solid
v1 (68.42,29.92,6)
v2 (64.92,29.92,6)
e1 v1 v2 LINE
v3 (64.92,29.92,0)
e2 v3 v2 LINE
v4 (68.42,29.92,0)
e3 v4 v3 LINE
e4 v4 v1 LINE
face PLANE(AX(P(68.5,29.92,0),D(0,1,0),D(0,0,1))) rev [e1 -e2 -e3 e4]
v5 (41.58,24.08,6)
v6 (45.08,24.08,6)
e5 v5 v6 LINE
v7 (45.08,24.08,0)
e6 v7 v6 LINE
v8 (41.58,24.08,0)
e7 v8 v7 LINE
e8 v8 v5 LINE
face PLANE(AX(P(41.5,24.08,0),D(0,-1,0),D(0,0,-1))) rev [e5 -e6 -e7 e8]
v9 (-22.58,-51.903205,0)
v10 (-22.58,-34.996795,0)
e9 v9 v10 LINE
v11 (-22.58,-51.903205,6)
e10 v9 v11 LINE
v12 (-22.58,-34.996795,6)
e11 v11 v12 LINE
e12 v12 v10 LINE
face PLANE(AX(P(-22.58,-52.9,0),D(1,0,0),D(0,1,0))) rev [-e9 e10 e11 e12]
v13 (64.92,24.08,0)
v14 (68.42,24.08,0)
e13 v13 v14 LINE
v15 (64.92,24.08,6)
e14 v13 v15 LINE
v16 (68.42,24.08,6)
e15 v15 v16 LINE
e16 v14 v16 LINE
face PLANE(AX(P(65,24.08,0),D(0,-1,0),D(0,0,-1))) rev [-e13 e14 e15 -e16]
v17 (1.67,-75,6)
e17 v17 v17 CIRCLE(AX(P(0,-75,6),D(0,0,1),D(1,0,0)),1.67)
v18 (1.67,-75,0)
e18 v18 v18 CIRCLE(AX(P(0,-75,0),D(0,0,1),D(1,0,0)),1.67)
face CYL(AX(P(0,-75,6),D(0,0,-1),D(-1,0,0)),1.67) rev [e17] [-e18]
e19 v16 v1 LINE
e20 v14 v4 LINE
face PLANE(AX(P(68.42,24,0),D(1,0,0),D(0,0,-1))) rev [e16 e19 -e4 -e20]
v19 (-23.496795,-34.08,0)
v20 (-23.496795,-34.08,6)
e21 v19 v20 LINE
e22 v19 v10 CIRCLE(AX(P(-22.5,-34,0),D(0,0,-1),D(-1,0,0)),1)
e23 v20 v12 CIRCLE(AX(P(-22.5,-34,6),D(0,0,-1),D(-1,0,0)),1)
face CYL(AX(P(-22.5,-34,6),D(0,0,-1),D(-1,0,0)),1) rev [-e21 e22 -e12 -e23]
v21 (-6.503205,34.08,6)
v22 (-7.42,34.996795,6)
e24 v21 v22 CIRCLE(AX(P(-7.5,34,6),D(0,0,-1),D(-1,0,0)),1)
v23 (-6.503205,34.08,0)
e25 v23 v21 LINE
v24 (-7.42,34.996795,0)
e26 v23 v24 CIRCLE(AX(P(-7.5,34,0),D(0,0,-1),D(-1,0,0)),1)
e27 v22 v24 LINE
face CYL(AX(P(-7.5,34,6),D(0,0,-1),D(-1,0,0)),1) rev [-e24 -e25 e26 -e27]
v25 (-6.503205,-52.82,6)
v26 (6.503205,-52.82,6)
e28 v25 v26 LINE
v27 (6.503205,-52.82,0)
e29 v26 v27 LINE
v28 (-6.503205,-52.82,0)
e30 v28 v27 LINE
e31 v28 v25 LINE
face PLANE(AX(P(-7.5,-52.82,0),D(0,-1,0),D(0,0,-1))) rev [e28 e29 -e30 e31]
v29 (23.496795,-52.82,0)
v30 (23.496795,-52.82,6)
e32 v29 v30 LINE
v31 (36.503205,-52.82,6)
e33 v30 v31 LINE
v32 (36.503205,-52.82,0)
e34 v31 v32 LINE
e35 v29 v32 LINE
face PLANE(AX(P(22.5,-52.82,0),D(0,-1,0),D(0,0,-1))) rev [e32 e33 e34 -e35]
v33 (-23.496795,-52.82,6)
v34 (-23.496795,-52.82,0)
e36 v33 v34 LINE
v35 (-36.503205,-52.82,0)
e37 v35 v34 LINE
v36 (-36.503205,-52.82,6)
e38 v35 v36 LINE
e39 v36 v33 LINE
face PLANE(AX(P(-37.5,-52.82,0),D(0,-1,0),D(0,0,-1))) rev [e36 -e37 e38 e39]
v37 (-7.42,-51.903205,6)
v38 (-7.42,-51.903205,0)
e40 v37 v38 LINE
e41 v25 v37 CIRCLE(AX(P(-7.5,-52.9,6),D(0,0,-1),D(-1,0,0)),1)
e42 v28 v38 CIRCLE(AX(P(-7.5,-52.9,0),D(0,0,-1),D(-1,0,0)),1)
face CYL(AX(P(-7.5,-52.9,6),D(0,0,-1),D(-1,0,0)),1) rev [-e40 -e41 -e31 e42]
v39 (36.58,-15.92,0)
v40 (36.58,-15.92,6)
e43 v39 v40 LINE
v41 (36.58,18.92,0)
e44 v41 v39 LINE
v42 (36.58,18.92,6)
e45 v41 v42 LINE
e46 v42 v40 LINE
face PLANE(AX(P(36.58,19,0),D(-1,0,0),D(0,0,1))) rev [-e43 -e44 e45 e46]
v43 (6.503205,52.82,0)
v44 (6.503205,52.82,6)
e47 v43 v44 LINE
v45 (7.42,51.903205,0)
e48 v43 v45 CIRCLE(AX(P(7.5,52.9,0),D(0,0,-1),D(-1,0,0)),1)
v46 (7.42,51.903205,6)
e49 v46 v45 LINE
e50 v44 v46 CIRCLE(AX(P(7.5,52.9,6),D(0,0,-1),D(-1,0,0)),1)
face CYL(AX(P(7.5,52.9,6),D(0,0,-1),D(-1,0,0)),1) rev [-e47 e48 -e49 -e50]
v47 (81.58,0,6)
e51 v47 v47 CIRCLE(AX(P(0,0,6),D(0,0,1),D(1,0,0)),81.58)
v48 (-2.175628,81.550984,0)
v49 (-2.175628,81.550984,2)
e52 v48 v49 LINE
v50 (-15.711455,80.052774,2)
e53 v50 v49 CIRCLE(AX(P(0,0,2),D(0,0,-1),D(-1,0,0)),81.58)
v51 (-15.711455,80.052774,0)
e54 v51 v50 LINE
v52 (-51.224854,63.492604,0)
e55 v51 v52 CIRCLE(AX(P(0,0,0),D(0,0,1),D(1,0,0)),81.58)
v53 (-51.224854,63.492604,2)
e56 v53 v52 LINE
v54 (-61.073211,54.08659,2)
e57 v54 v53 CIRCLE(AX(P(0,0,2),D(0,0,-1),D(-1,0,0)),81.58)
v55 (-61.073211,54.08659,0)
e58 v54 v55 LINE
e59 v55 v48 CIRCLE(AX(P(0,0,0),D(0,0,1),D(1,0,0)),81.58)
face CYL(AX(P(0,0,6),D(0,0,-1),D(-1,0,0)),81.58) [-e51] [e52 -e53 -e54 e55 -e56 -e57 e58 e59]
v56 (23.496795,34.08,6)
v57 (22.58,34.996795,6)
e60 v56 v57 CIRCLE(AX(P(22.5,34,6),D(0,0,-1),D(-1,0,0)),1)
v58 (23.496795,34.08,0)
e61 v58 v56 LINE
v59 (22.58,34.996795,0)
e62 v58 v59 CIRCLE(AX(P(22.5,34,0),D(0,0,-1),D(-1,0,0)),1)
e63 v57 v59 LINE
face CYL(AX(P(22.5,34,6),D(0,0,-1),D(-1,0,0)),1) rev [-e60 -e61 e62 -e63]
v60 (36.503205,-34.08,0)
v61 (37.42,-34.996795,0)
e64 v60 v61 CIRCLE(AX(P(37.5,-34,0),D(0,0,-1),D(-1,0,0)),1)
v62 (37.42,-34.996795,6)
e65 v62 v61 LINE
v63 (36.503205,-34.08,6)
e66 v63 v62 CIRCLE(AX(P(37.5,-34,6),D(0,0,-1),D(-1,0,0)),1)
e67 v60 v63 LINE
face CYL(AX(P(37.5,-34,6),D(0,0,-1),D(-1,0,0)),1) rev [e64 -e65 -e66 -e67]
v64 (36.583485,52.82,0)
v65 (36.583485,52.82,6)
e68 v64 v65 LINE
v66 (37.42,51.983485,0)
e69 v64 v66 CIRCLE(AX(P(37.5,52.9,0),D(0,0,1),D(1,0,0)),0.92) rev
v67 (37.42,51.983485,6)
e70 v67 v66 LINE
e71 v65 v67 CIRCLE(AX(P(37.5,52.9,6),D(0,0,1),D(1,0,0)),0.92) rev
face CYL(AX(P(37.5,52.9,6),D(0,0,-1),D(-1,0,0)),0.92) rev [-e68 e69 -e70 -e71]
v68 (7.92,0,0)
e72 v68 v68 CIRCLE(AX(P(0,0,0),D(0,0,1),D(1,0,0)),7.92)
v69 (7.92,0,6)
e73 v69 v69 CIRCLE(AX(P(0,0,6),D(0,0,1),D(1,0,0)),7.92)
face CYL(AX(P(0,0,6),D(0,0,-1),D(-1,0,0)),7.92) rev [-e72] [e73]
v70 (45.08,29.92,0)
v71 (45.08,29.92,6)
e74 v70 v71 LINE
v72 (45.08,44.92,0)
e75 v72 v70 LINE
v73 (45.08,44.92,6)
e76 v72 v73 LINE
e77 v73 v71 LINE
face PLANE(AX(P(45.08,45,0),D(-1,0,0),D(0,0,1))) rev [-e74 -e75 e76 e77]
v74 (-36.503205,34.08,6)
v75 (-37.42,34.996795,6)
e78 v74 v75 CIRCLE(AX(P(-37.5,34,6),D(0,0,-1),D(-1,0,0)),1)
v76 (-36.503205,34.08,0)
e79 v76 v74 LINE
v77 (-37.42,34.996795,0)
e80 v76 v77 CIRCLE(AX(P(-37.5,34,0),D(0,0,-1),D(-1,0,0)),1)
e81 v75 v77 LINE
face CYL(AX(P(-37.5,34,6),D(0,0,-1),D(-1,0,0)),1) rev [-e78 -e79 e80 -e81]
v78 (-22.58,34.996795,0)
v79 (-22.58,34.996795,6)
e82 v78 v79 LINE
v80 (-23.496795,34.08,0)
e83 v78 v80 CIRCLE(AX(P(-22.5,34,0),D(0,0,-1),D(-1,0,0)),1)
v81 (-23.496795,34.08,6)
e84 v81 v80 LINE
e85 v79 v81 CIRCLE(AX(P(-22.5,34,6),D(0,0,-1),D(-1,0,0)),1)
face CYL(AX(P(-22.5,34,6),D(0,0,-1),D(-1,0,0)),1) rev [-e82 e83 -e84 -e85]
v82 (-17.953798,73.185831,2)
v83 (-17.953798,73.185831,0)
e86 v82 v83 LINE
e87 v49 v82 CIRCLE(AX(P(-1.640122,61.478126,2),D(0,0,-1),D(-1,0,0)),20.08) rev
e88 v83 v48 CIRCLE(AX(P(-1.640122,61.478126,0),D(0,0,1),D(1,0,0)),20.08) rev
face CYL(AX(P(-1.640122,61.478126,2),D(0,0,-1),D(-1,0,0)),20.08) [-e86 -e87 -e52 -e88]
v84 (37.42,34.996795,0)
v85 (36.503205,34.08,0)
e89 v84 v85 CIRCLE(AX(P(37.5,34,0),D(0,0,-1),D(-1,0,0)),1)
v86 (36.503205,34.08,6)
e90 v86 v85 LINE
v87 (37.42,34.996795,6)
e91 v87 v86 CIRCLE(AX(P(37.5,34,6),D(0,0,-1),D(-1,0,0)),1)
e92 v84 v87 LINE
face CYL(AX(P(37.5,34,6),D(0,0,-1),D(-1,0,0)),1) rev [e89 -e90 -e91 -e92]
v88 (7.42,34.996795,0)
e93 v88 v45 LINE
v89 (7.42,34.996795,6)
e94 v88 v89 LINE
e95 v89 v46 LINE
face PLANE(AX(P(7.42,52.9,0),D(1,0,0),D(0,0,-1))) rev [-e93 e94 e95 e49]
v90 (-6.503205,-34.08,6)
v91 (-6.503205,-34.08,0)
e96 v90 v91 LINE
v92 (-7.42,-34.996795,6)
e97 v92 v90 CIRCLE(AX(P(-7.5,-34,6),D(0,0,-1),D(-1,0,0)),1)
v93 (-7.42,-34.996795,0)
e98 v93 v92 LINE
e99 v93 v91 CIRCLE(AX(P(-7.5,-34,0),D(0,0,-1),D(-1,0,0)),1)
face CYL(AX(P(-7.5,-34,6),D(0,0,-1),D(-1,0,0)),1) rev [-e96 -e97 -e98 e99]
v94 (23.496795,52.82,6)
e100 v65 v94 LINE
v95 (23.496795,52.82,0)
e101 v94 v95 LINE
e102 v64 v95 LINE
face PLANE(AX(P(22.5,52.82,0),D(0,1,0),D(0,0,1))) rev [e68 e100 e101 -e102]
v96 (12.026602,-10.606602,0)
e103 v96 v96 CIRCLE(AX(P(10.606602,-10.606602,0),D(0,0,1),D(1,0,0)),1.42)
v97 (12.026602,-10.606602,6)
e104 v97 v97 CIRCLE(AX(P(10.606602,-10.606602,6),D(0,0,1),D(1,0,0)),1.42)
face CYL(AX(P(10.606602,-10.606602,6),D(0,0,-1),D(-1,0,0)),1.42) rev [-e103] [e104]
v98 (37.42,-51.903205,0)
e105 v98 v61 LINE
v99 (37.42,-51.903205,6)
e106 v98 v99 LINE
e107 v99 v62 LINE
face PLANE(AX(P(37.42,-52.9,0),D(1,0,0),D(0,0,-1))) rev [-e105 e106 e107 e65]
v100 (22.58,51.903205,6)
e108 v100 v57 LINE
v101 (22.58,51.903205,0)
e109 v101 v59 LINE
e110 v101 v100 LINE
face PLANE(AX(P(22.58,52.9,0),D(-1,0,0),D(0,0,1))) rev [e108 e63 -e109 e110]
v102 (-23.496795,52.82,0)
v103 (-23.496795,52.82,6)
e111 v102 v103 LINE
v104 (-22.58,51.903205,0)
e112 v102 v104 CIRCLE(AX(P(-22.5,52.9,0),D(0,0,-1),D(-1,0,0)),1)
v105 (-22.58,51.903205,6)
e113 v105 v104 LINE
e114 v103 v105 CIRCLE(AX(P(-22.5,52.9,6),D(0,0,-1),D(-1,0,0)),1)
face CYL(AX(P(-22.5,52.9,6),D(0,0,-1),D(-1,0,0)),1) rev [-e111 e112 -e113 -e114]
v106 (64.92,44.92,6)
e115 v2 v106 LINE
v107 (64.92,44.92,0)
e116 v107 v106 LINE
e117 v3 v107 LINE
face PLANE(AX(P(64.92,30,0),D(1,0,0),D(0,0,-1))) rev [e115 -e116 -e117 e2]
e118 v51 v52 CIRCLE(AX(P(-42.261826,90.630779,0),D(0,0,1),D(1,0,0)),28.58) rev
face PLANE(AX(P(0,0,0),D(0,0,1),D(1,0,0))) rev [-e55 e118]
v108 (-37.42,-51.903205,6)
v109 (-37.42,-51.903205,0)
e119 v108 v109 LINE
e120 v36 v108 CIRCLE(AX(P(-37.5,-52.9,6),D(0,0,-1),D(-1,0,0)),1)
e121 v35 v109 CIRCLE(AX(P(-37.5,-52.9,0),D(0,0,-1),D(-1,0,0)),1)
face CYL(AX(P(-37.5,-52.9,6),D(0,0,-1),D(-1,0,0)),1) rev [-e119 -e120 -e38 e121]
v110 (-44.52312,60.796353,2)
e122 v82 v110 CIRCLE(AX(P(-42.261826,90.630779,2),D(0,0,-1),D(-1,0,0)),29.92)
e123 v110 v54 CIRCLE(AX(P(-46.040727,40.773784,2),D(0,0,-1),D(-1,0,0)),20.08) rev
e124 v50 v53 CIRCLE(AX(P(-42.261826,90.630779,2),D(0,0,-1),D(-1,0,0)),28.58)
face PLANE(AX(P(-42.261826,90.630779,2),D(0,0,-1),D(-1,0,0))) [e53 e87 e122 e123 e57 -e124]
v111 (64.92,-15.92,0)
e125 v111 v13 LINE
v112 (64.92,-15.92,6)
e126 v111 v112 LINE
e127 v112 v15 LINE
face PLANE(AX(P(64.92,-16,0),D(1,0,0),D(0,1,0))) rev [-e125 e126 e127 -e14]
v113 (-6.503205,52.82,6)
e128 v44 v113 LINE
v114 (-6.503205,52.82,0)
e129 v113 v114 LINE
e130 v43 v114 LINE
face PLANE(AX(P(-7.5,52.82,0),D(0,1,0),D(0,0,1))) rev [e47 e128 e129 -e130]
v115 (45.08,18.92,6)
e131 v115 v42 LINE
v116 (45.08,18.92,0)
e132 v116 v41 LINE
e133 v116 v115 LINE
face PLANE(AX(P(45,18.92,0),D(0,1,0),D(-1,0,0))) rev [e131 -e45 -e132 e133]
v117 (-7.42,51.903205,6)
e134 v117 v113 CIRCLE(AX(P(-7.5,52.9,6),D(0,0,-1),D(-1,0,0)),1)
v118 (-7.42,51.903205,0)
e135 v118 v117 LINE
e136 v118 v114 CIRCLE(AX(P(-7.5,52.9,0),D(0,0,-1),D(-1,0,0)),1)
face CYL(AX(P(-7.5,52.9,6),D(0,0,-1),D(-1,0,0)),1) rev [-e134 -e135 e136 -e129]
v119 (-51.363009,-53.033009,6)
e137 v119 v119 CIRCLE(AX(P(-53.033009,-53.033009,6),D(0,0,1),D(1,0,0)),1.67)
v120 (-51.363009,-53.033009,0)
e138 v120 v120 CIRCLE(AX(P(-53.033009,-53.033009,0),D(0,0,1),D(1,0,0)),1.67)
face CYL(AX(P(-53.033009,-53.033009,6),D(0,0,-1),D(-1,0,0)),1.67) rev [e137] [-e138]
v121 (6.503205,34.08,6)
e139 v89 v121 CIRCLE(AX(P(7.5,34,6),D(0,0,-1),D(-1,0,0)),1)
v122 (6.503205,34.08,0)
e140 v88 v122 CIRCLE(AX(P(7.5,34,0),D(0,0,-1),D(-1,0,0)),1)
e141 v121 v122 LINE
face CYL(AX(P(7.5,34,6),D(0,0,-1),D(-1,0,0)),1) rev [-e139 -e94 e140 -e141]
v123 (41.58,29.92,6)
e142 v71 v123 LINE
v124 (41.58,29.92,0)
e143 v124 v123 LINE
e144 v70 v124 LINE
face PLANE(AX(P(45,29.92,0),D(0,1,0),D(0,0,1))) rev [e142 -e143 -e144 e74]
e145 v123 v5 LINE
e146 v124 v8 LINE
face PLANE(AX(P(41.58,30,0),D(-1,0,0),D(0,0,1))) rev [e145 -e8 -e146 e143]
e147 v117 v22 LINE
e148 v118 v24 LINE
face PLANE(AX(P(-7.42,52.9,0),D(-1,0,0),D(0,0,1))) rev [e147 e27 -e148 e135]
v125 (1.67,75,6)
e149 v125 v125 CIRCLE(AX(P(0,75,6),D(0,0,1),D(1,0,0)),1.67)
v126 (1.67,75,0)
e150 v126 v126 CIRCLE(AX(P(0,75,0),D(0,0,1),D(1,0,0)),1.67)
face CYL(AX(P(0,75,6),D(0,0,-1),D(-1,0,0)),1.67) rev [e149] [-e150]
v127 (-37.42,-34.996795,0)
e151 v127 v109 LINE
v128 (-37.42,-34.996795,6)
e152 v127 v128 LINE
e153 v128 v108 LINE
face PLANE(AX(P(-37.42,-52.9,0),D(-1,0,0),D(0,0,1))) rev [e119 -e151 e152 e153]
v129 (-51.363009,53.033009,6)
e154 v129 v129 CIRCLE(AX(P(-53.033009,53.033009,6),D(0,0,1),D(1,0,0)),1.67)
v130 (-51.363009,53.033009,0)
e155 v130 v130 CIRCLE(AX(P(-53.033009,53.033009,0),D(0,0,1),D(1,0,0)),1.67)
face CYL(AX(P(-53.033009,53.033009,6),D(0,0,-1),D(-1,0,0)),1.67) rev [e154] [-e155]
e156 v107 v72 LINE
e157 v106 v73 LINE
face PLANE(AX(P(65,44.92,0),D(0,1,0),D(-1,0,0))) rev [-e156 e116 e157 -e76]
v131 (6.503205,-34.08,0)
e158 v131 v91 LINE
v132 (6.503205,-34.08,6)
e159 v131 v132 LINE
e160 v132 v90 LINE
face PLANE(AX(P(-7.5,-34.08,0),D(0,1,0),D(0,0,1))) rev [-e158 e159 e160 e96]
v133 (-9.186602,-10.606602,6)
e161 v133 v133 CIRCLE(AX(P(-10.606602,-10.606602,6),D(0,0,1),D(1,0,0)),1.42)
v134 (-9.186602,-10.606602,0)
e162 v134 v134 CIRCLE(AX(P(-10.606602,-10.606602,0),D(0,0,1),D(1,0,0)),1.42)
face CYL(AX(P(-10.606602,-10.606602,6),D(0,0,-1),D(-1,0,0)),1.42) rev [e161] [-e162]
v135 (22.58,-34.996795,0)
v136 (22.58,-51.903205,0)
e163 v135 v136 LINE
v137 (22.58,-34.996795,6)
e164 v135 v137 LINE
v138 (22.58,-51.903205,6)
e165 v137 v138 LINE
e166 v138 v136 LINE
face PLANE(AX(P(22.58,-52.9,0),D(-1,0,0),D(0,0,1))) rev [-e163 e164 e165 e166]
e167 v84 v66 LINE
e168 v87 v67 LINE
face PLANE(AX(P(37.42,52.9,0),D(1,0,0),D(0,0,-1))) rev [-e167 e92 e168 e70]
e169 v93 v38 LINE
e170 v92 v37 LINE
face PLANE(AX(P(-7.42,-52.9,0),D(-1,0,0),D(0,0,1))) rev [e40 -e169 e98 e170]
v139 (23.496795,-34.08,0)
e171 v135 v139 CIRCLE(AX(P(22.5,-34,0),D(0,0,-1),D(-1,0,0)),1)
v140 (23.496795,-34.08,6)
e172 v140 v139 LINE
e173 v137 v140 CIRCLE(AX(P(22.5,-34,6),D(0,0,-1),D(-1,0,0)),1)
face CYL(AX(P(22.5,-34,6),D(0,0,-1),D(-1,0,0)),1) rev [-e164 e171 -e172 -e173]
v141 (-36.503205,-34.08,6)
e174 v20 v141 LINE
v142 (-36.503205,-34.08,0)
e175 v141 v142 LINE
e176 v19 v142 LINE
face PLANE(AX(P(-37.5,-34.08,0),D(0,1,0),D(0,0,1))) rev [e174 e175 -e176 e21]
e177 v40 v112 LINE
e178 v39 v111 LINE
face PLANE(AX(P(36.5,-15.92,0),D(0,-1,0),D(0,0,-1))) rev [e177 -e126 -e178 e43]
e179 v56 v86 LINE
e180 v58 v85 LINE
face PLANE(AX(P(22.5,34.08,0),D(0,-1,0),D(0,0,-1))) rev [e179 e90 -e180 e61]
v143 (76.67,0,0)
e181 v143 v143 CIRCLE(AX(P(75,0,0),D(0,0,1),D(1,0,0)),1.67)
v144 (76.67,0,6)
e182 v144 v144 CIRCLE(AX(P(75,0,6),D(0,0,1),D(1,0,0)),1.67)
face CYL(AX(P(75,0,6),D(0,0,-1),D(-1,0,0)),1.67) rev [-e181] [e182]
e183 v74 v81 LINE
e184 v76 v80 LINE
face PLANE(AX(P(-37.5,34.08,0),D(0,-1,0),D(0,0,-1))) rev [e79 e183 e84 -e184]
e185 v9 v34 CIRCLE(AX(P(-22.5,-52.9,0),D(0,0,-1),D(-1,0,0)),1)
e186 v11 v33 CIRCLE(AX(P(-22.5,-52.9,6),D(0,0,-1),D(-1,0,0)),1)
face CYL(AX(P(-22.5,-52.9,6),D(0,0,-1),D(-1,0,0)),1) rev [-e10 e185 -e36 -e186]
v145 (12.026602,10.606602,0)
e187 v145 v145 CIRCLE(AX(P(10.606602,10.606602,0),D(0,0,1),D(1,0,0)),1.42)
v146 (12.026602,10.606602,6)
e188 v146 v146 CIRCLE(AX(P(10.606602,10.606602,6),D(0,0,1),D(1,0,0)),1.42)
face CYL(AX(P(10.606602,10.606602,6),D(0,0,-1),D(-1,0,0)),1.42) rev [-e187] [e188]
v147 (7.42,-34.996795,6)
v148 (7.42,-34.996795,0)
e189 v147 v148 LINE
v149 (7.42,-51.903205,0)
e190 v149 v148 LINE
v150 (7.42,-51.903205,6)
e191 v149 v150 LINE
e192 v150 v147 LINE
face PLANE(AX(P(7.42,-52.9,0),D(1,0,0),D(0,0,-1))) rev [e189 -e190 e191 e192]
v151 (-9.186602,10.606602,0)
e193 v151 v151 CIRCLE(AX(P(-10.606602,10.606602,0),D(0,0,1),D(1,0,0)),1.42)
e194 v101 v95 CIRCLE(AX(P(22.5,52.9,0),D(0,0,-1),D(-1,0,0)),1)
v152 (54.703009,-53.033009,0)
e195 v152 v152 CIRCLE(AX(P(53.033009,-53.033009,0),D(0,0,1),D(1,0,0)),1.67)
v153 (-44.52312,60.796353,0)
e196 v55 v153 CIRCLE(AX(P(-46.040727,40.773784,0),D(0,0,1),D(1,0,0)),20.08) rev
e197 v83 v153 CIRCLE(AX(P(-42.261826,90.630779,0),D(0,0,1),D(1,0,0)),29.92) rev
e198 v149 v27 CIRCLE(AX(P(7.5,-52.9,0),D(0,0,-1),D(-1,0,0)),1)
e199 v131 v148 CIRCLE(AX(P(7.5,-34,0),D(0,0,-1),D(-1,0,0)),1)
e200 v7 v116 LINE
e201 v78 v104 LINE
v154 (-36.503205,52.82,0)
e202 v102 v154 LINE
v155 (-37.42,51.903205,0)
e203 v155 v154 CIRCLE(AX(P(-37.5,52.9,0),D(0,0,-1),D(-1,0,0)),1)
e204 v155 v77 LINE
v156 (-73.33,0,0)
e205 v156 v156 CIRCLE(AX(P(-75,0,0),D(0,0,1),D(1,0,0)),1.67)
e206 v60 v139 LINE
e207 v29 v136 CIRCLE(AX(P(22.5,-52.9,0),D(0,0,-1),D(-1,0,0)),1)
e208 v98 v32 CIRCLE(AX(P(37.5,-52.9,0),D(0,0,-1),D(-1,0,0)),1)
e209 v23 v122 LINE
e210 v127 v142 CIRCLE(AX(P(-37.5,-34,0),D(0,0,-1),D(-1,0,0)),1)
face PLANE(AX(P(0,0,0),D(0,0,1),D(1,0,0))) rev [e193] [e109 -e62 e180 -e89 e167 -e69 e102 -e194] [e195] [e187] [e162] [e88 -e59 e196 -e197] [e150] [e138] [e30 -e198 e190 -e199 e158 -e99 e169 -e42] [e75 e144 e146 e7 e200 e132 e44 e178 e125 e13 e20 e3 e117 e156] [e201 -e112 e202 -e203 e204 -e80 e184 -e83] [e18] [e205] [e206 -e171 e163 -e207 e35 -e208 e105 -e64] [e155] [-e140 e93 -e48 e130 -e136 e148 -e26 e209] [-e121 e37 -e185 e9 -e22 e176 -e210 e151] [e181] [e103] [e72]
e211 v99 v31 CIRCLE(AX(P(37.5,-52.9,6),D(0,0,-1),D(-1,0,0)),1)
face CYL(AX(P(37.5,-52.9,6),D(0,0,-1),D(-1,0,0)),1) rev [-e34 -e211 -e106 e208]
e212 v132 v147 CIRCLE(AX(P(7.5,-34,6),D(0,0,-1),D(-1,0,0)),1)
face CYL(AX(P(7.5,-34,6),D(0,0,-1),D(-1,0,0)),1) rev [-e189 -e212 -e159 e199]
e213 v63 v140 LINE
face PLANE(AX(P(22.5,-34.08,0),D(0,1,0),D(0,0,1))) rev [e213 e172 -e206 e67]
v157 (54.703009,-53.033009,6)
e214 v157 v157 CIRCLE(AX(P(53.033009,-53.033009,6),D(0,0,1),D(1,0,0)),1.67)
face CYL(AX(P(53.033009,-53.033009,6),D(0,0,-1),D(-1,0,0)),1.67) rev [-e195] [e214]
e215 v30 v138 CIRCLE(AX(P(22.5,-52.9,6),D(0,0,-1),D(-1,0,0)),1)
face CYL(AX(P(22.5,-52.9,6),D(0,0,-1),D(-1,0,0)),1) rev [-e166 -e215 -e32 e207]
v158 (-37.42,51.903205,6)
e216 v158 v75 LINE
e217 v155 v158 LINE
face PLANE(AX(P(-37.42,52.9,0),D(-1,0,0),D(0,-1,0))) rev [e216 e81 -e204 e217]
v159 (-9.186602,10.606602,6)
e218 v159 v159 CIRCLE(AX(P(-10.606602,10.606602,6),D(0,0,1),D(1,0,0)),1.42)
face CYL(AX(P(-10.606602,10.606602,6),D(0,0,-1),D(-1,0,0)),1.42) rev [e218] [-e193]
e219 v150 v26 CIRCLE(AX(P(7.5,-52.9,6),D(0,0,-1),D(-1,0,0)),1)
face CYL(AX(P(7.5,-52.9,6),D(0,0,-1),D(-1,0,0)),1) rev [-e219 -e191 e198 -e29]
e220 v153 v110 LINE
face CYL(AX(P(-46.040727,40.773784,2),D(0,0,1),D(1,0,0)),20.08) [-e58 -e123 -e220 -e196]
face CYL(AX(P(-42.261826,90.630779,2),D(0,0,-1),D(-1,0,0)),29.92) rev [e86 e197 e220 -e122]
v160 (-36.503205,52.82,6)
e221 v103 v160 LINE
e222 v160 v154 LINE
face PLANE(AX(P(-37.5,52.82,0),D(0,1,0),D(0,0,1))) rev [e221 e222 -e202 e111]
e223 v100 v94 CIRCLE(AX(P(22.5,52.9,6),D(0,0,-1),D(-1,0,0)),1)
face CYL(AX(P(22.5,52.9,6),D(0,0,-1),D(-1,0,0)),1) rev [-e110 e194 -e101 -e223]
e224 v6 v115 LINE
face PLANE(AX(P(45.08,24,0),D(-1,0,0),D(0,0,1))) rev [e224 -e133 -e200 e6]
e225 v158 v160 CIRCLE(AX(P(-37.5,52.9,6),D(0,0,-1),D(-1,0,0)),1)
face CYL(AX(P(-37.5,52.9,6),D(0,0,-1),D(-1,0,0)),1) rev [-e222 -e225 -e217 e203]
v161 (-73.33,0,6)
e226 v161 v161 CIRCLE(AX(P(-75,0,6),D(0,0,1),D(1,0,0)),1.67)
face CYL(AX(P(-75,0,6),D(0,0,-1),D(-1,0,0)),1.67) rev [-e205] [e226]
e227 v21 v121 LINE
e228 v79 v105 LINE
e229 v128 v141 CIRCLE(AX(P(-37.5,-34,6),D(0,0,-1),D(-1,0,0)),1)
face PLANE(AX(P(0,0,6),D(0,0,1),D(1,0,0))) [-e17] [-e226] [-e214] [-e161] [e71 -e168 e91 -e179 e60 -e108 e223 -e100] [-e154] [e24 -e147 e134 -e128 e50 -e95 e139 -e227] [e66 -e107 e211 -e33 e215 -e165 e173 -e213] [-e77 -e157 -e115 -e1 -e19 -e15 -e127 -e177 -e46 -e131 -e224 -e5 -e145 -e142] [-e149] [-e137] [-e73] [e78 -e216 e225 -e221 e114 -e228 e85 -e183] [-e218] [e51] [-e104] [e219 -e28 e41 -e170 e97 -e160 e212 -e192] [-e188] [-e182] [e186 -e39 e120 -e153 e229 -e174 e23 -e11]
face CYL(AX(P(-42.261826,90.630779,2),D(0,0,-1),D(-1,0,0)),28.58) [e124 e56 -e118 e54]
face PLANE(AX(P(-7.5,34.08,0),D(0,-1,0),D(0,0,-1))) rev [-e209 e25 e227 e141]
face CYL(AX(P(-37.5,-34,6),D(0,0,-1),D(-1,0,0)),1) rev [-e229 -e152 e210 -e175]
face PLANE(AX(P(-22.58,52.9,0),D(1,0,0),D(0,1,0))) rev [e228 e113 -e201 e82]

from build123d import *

# Parameters (mm, degrees)
SKETCH1_R              = 81.5
SKETCH1_R_2            = 8
SKETCH1_R_3            = 1.5
SKETCH1_R_4            = 1.75
BOSS_EXTRUDE1_DEPTH    = 6
CUT_EXTRUDE9_DEPTH     = 116.414470497
SKETCH13_W             = 15
SKETCH13_H             = 18.9
CUT_EXTRUDE10_DEPTH    = 116.414470497
SKETCH18_R             = 30
SKETCH18_R_2           = 28.5
CUT_EXTRUDE14_DEPTH    = 2
FILLET2_R              = 20
SKETCH19_R             = 1
CUT_EXTRUDE15_DEPTH    = 116.414470643
MOVE_FACE2_OUTLINE_R   = 8
MOVE_FACE2_OUTLINE_R_2 = 7.92
MOVE_FACE2_OUTLINE_R_3 = 1.5
MOVE_FACE2_OUTLINE_R_4 = 1.42
MOVE_FACE2_OUTLINE_R_5 = 1.75
MOVE_FACE2_OUTLINE_R_6 = 1.67
MOVE_FACE2_DEPTH       = 6
MOVE_START             = 2
MOVE_FACE2_2_DEPTH     = 4


# Read off the part's stored shape, not the designer's step: Move Face2
with BuildPart() as part:
    # Sketch1 → Boss-Extrude1 (new body)
    with BuildSketch(Plane.XY):
        Circle(SKETCH1_R)
        Circle(SKETCH1_R_2, mode=Mode.SUBTRACT)
        with Locations((10.606601718, -10.606601718)):
            Circle(SKETCH1_R_3, mode=Mode.SUBTRACT)
        with Locations((0, -75)):
            Circle(SKETCH1_R_4, mode=Mode.SUBTRACT)
        with Locations((-10.606601718, -10.606601718)):
            Circle(SKETCH1_R_3, mode=Mode.SUBTRACT)
        with Locations((-10.606601718, 10.606601718)):
            Circle(SKETCH1_R_3, mode=Mode.SUBTRACT)
        with Locations((10.606601718, 10.606601718)):
            Circle(SKETCH1_R_3, mode=Mode.SUBTRACT)
        with Locations((-53.033008589, -53.033008589)):
            Circle(SKETCH1_R_4, mode=Mode.SUBTRACT)
        with Locations((-75, 0)):
            Circle(SKETCH1_R_4, mode=Mode.SUBTRACT)
        with Locations((-53.033008589, 53.033008589)):
            Circle(SKETCH1_R_4, mode=Mode.SUBTRACT)
        with Locations((0, 75)):
            Circle(SKETCH1_R_4, mode=Mode.SUBTRACT)
        with Locations((75, 0)):
            Circle(SKETCH1_R_4, mode=Mode.SUBTRACT)
        with Locations((53.033008589, -53.033008589)):
            Circle(SKETCH1_R_4, mode=Mode.SUBTRACT)
    extrude(amount=BOSS_EXTRUDE1_DEPTH)

    # Sketch12 → Cut-Extrude9 (cut, through all)
    with BuildSketch(Plane.XY.offset(6)):
        Polygon((36.5, -16), (65, -16), (65, 24), (68.5, 24), (68.5, 30), (65, 30), (65, 45), (45, 45), (45, 30), (41.5, 30), (41.5, 24), (45, 24), (45, 19), (36.5, 19), align=None)
    extrude(amount=-CUT_EXTRUDE9_DEPTH, mode=Mode.SUBTRACT)

    # Sketch13 → Cut-Extrude10 (cut, through all)
    with BuildSketch(Plane.XY.offset(6)):
        with Locations((-30, -43.45)):
            Rectangle(SKETCH13_W, SKETCH13_H)
        with Locations((-30, 43.45)):
            Rectangle(SKETCH13_W, SKETCH13_H)
        with Locations((30, 43.45)):
            Rectangle(SKETCH13_W, SKETCH13_H)
        with Locations((0, -43.45)):
            Rectangle(SKETCH13_W, SKETCH13_H)
        with Locations((30, -43.45)):
            Rectangle(SKETCH13_W, SKETCH13_H)
        with Locations((0, 43.45)):
            Rectangle(SKETCH13_W, SKETCH13_H)
    extrude(amount=-CUT_EXTRUDE10_DEPTH, mode=Mode.SUBTRACT)

    # Sketch18 → Cut-Extrude14 (cut)
    with BuildSketch(Plane(origin=(0, 0, 0), x_dir=(-1, 0, 0), z_dir=(0, 0, -1))):
        with Locations((42.261826174, 90.630778704)):
            Circle(SKETCH18_R)
        with Locations((42.261826174, 90.630778704)):
            Circle(SKETCH18_R_2, mode=Mode.SUBTRACT)
    extrude(amount=-CUT_EXTRUDE14_DEPTH, mode=Mode.SUBTRACT)

    # Fillet2
    fillet2_edges = [part.edges().sort_by_distance(p)[0] for p in [
        (-52.421789967, 62.403573108, 1),
        (-14.107833342, 80.269664497, 1),
    ]]
    fillet(fillet2_edges, radius=FILLET2_R)

    # Sketch19 → Cut-Extrude15 (cut, through all)
    with BuildSketch(Plane(origin=(0, 0, 0), x_dir=(-1, 0, 0), z_dir=(0, 0, -1))):
        with Locations((-37.5, 52.9)):
            Circle(SKETCH19_R)
        with Locations((-22.5, 52.9)):
            Circle(SKETCH19_R)
        with Locations((-37.5, 34)):
            Circle(SKETCH19_R)
        with Locations((-22.5, 34)):
            Circle(SKETCH19_R)
        with Locations((-7.5, 52.9)):
            Circle(SKETCH19_R)
        with Locations((7.5, 52.9)):
            Circle(SKETCH19_R)
        with Locations((-7.5, 34)):
            Circle(SKETCH19_R)
        with Locations((7.5, 34)):
            Circle(SKETCH19_R)
        with Locations((22.5, 52.9)):
            Circle(SKETCH19_R)
        with Locations((37.5, 52.9)):
            Circle(SKETCH19_R)
        with Locations((22.5, 34)):
            Circle(SKETCH19_R)
        with Locations((37.5, 34)):
            Circle(SKETCH19_R)
        with Locations((-37.5, -34)):
            Circle(SKETCH19_R)
        with Locations((-22.5, -34)):
            Circle(SKETCH19_R)
        with Locations((-37.5, -52.9)):
            Circle(SKETCH19_R)
        with Locations((-22.5, -52.9)):
            Circle(SKETCH19_R)
        with Locations((-7.5, -34)):
            Circle(SKETCH19_R)
        with Locations((7.5, -34)):
            Circle(SKETCH19_R)
        with Locations((-7.5, -52.9)):
            Circle(SKETCH19_R)
        with Locations((7.5, -52.9)):
            Circle(SKETCH19_R)
        with Locations((22.5, -34)):
            Circle(SKETCH19_R)
        with Locations((37.5, -34)):
            Circle(SKETCH19_R)
        with Locations((22.5, -52.9)):
            Circle(SKETCH19_R)
        with Locations((37.5, -52.9)):
            Circle(SKETCH19_R)
    extrude(amount=-CUT_EXTRUDE15_DEPTH, mode=Mode.SUBTRACT)

    # Move Face2 outline → Move Face2 (add)
    # profile 1 of 38: a face of its own
    with BuildSketch(Plane.XY):
        with BuildLine():
            ThreePointArc((-61.073211328, 54.086590372), (34.477197793, -73.936589266), (-2.175628477, 81.550984303))
            ThreePointArc((-2.175628477, 81.550984303), (-11.045848253, 79.219003094), (-17.953798386, 73.18583144))
            ThreePointArc((-17.953798386, 73.18583144), (-29.617087783, 63.514049716), (-44.52312034, 60.79635314))
            ThreePointArc((-44.52312034, 60.79635314), (-53.585142714, 59.382604315), (-61.073211328, 54.086590372))
        make_face()
        with BuildLine():
            ThreePointArc((-61.013320951, 54.033551304), (-53.55508528, 59.308465589), (-44.529166581, 60.716581949))
            ThreePointArc((-44.529166581, 60.716581949), (-29.583278322, 63.441545093), (-17.888803659, 73.139187196))
            ThreePointArc((-17.888803659, 73.139187196), (-11.00837524, 79.14832231), (-2.173494985, 81.471012756))
            ThreePointArc((-2.173494985, 81.471012756), (34.443388332, -73.864084644), (-61.013320951, 54.033551304))
        make_face(mode=Mode.SUBTRACT)
    # profile 2 of 38: a face of its own
    with BuildSketch(Plane.XY):
        with BuildLine():
            ThreePointArc((-15.711454974, 80.052773735), (-34.477197793, 73.936589267), (-51.224853888, 63.492603854))
            ThreePointArc((-51.224853888, 63.492603854), (-30.183396253, 64.72850215), (-15.711454974, 80.052773735))
        make_face()
        with BuildLine():
            ThreePointArc((-51.059856357, 63.522760242), (-34.443388332, 73.864084643), (-15.840614477, 79.945762446))
            ThreePointArc((-15.840614477, 79.945762446), (-30.217205714, 64.801006773), (-51.059856357, 63.522760242))
        make_face(mode=Mode.SUBTRACT)
    # profile 3 of 38: a face of its own
    with BuildSketch(Plane.XY):
        with BuildLine():
            Line((-37.42, -51.903205136), (-37.42, -34.996794864))
            ThreePointArc((-37.42, -34.996794864), (-37.45996791, -34.999198395), (-37.5, -35))
            Line((-37.5, -35), (-37.5, -51.9))
            ThreePointArc((-37.5, -51.9), (-37.45996791, -51.900801605), (-37.42, -51.903205136))
        make_face()
    # profile 4 of 38: a face of its own
    with BuildSketch(Plane.XY):
        with BuildLine():
            Line((-23.5, -34), (-36.5, -34))
            ThreePointArc((-36.5, -34), (-36.500801605, -34.04003209), (-36.503205136, -34.08))
            Line((-36.503205136, -34.08), (-23.496794864, -34.08))
            ThreePointArc((-23.496794864, -34.08), (-23.499198395, -34.04003209), (-23.5, -34))
        make_face()
    # profile 5 of 38: a face of its own
    with BuildSketch(Plane.XY):
        with BuildLine():
            ThreePointArc((-36.503205136, -52.82), (-36.500801605, -52.85996791), (-36.5, -52.9))
            Line((-36.5, -52.9), (-23.5, -52.9))
            ThreePointArc((-23.5, -52.9), (-23.499198395, -52.85996791), (-23.496794864, -52.82))
            Line((-23.496794864, -52.82), (-36.503205136, -52.82))
        make_face()
    # profile 6 of 38: a face of its own
    with BuildSketch(Plane.XY):
        with BuildLine():
            Line((-22.5, -51.9), (-22.5, -35))
            ThreePointArc((-22.5, -35), (-22.54003209, -34.999198395), (-22.58, -34.996794864))
            Line((-22.58, -34.996794864), (-22.58, -51.903205136))
            ThreePointArc((-22.58, -51.903205136), (-22.54003209, -51.900801605), (-22.5, -51.9))
        make_face()
    # profile 7 of 38: a face of its own
    with BuildSketch(Plane.XY):
        with BuildLine():
            Line((-37.42, 34.996794864), (-37.42, 51.903205136))
            ThreePointArc((-37.42, 51.903205136), (-37.45996791, 51.900801605), (-37.5, 51.9))
            Line((-37.5, 51.9), (-37.5, 35))
            ThreePointArc((-37.5, 35), (-37.45996791, 34.999198395), (-37.42, 34.996794864))
        make_face()
    # profile 8 of 38: a face of its own
    with BuildSketch(Plane.XY):
        with BuildLine():
            Line((-23.5, 52.9), (-36.5, 52.9))
            ThreePointArc((-36.5, 52.9), (-36.500801605, 52.85996791), (-36.503205136, 52.82))
            Line((-36.503205136, 52.82), (-23.496794864, 52.82))
            ThreePointArc((-23.496794864, 52.82), (-23.499198395, 52.85996791), (-23.5, 52.9))
        make_face()
    # profile 9 of 38: a face of its own
    with BuildSketch(Plane.XY):
        with BuildLine():
            ThreePointArc((-36.503205136, 34.08), (-36.500801605, 34.04003209), (-36.5, 34))
            Line((-36.5, 34), (-23.5, 34))
            ThreePointArc((-23.5, 34), (-23.499198395, 34.04003209), (-23.496794864, 34.08))
            Line((-23.496794864, 34.08), (-36.503205136, 34.08))
        make_face()
    # profile 10 of 38: a face of its own
    with BuildSketch(Plane.XY):
        with BuildLine():
            Line((-22.5, 35), (-22.5, 51.9))
            ThreePointArc((-22.5, 51.9), (-22.54003209, 51.900801605), (-22.58, 51.903205136))
            Line((-22.58, 51.903205136), (-22.58, 34.996794864))
            ThreePointArc((-22.58, 34.996794864), (-22.54003209, 34.999198395), (-22.5, 35))
        make_face()
    # profile 11 of 38: a face of its own
    with BuildSketch(Plane.XY):
        with BuildLine():
            Line((-6.503205136, -34.08), (6.503205136, -34.08))
            ThreePointArc((6.503205136, -34.08), (6.500801605, -34.04003209), (6.5, -34))
            Line((6.5, -34), (-6.5, -34))
            ThreePointArc((-6.5, -34), (-6.500801605, -34.04003209), (-6.503205136, -34.08))
        make_face()
    # profile 12 of 38: a face of its own
    with BuildSketch(Plane.XY):
        with BuildLine():
            Line((7.5, -51.9), (7.5, -35))
            ThreePointArc((7.5, -35), (7.45996791, -34.999198395), (7.42, -34.996794864))
            Line((7.42, -34.996794864), (7.42, -51.903205136))
            ThreePointArc((7.42, -51.903205136), (7.45996791, -51.900801605), (7.5, -51.9))
        make_face()
    # profile 13 of 38: a face of its own
    with BuildSketch(Plane.XY):
        with BuildLine():
            ThreePointArc((-7.42, -34.996794864), (-7.45996791, -34.999198395), (-7.5, -35))
            Line((-7.5, -35), (-7.5, -51.9))
            ThreePointArc((-7.5, -51.9), (-7.45996791, -51.900801605), (-7.42, -51.903205136))
            Line((-7.42, -51.903205136), (-7.42, -34.996794864))
        make_face()
    # profile 14 of 38: a face of its own
    with BuildSketch(Plane.XY):
        with BuildLine():
            Line((-6.5, -52.9), (6.5, -52.9))
            ThreePointArc((6.5, -52.9), (6.500801605, -52.85996791), (6.503205136, -52.82))
            Line((6.503205136, -52.82), (-6.503205136, -52.82))
            ThreePointArc((-6.503205136, -52.82), (-6.500801605, -52.85996791), (-6.5, -52.9))
        make_face()
    # profile 15 of 38: a face of its own
    with BuildSketch(Plane.XY):
        with BuildLine():
            Line((23.496794864, -34.08), (36.503205136, -34.08))
            ThreePointArc((36.503205136, -34.08), (36.500801605, -34.04003209), (36.5, -34))
            Line((36.5, -34), (23.5, -34))
            ThreePointArc((23.5, -34), (23.499198395, -34.04003209), (23.496794864, -34.08))
        make_face()
    # profile 16 of 38: a face of its own
    with BuildSketch(Plane.XY):
        with BuildLine():
            Line((37.5, -51.9), (37.5, -35))
            ThreePointArc((37.5, -35), (37.45996791, -34.999198395), (37.42, -34.996794864))
            Line((37.42, -34.996794864), (37.42, -51.903205136))
            ThreePointArc((37.42, -51.903205136), (37.45996791, -51.900801605), (37.5, -51.9))
        make_face()
    # profile 17 of 38: a face of its own
    with BuildSketch(Plane.XY):
        with BuildLine():
            ThreePointArc((22.58, -34.996794864), (22.54003209, -34.999198395), (22.5, -35))
            Line((22.5, -35), (22.5, -51.9))
            ThreePointArc((22.5, -51.9), (22.54003209, -51.900801605), (22.58, -51.903205136))
            Line((22.58, -51.903205136), (22.58, -34.996794864))
        make_face()
    # profile 18 of 38: a face of its own
    with BuildSketch(Plane.XY):
        with BuildLine():
            Line((23.5, -52.9), (36.5, -52.9))
            ThreePointArc((36.5, -52.9), (36.500801605, -52.85996791), (36.503205136, -52.82))
            Line((36.503205136, -52.82), (23.496794864, -52.82))
            ThreePointArc((23.496794864, -52.82), (23.499198395, -52.85996791), (23.5, -52.9))
        make_face()
    # profile 19 of 38: a face of its own
    with BuildSketch(Plane.XY):
        with BuildLine():
            Line((23.496794864, 52.82), (36.583484861, 52.82))
            ThreePointArc((36.583484861, 52.82), (38.150538239, 53.550538239), (37.42, 51.983484861))
            Line((37.42, 51.983484861), (37.42, 34.996794864))
            ThreePointArc((37.42, 34.996794864), (37.45996791, 34.999198395), (37.5, 35))
            Line((37.5, 35), (37.5, 51.9))
            ThreePointArc((37.5, 51.9), (38.207106781, 53.607106781), (36.5, 52.9))
            Line((36.5, 52.9), (23.5, 52.9))
            ThreePointArc((23.5, 52.9), (23.499198395, 52.85996791), (23.496794864, 52.82))
        make_face()
    # profile 20 of 38: a face of its own
    with BuildSketch(Plane.XY):
        with BuildLine():
            ThreePointArc((22.58, 51.903205136), (22.54003209, 51.900801605), (22.5, 51.9))
            Line((22.5, 51.9), (22.5, 35))
            ThreePointArc((22.5, 35), (22.54003209, 34.999198395), (22.58, 34.996794864))
            Line((22.58, 34.996794864), (22.58, 51.903205136))
        make_face()
    # profile 21 of 38: a face of its own
    with BuildSketch(Plane.XY):
        with BuildLine():
            Line((23.5, 34), (36.5, 34))
            ThreePointArc((36.5, 34), (36.500801605, 34.04003209), (36.503205136, 34.08))
            Line((36.503205136, 34.08), (23.496794864, 34.08))
            ThreePointArc((23.496794864, 34.08), (23.499198395, 34.04003209), (23.5, 34))
        make_face()
    # profile 22 of 38: a face of its own
    with BuildSketch(Plane.XY):
        with BuildLine():
            Line((-6.503205136, 52.82), (6.503205136, 52.82))
            ThreePointArc((6.503205136, 52.82), (6.500801605, 52.85996791), (6.5, 52.9))
            Line((6.5, 52.9), (-6.5, 52.9))
            ThreePointArc((-6.5, 52.9), (-6.500801605, 52.85996791), (-6.503205136, 52.82))
        make_face()
    # profile 23 of 38: a face of its own
    with BuildSketch(Plane.XY):
        with BuildLine():
            Line((7.5, 35), (7.5, 51.9))
            ThreePointArc((7.5, 51.9), (7.45996791, 51.900801605), (7.42, 51.903205136))
            Line((7.42, 51.903205136), (7.42, 34.996794864))
            ThreePointArc((7.42, 34.996794864), (7.45996791, 34.999198395), (7.5, 35))
        make_face()
    # profile 24 of 38: a face of its own
    with BuildSketch(Plane.XY):
        with BuildLine():
            ThreePointArc((-7.42, 51.903205136), (-7.45996791, 51.900801605), (-7.5, 51.9))
            Line((-7.5, 51.9), (-7.5, 35))
            ThreePointArc((-7.5, 35), (-7.45996791, 34.999198395), (-7.42, 34.996794864))
            Line((-7.42, 34.996794864), (-7.42, 51.903205136))
        make_face()
    # profile 25 of 38: a face of its own
    with BuildSketch(Plane.XY):
        with BuildLine():
            Line((-6.5, 34), (6.5, 34))
            ThreePointArc((6.5, 34), (6.500801605, 34.04003209), (6.503205136, 34.08))
            Line((6.503205136, 34.08), (-6.503205136, 34.08))
            ThreePointArc((-6.503205136, 34.08), (-6.500801605, 34.04003209), (-6.5, 34))
        make_face()
    # profile 26 of 38: a face of its own
    with BuildSketch(Plane.XY):
        Circle(MOVE_FACE2_OUTLINE_R)
        Circle(MOVE_FACE2_OUTLINE_R_2, mode=Mode.SUBTRACT)
    # profile 27 of 38: a face of its own
    with BuildSketch(Plane.XY):
        with Locations((10.606601718, -10.606601718)):
            Circle(MOVE_FACE2_OUTLINE_R_3)
        with Locations((10.606601718, -10.606601718)):
            Circle(MOVE_FACE2_OUTLINE_R_4, mode=Mode.SUBTRACT)
    # profile 28 of 38: a face of its own
    with BuildSketch(Plane.XY):
        with Locations((0, -75)):
            Circle(MOVE_FACE2_OUTLINE_R_5)
        with Locations((0, -75)):
            Circle(MOVE_FACE2_OUTLINE_R_6, mode=Mode.SUBTRACT)
    # profile 29 of 38: a face of its own
    with BuildSketch(Plane.XY):
        with Locations((-10.606601718, -10.606601718)):
            Circle(MOVE_FACE2_OUTLINE_R_3)
        with Locations((-10.606601718, -10.606601718)):
            Circle(MOVE_FACE2_OUTLINE_R_4, mode=Mode.SUBTRACT)
    # profile 30 of 38: a face of its own
    with BuildSketch(Plane.XY):
        with Locations((-10.606601718, 10.606601718)):
            Circle(MOVE_FACE2_OUTLINE_R_3)
        with Locations((-10.606601718, 10.606601718)):
            Circle(MOVE_FACE2_OUTLINE_R_4, mode=Mode.SUBTRACT)
    # profile 31 of 38: a face of its own
    with BuildSketch(Plane.XY):
        with Locations((10.606601718, 10.606601718)):
            Circle(MOVE_FACE2_OUTLINE_R_3)
        with Locations((10.606601718, 10.606601718)):
            Circle(MOVE_FACE2_OUTLINE_R_4, mode=Mode.SUBTRACT)
    # profile 32 of 38: a face of its own
    with BuildSketch(Plane.XY):
        with Locations((-53.033008589, -53.033008589)):
            Circle(MOVE_FACE2_OUTLINE_R_5)
        with Locations((-53.033008589, -53.033008589)):
            Circle(MOVE_FACE2_OUTLINE_R_6, mode=Mode.SUBTRACT)
    # profile 33 of 38: a face of its own
    with BuildSketch(Plane.XY):
        with Locations((-75, 0)):
            Circle(MOVE_FACE2_OUTLINE_R_5)
        with Locations((-75, 0)):
            Circle(MOVE_FACE2_OUTLINE_R_6, mode=Mode.SUBTRACT)
    # profile 34 of 38: a face of its own
    with BuildSketch(Plane.XY):
        with Locations((-53.033008589, 53.033008589)):
            Circle(MOVE_FACE2_OUTLINE_R_5)
        with Locations((-53.033008589, 53.033008589)):
            Circle(MOVE_FACE2_OUTLINE_R_6, mode=Mode.SUBTRACT)
    # profile 35 of 38: a face of its own
    with BuildSketch(Plane.XY):
        with Locations((0, 75)):
            Circle(MOVE_FACE2_OUTLINE_R_5)
        with Locations((0, 75)):
            Circle(MOVE_FACE2_OUTLINE_R_6, mode=Mode.SUBTRACT)
    # profile 36 of 38: a face of its own
    with BuildSketch(Plane.XY):
        with Locations((75, 0)):
            Circle(MOVE_FACE2_OUTLINE_R_5)
        with Locations((75, 0)):
            Circle(MOVE_FACE2_OUTLINE_R_6, mode=Mode.SUBTRACT)
    # profile 37 of 38: a face of its own
    with BuildSketch(Plane.XY):
        with Locations((53.033008589, -53.033008589)):
            Circle(MOVE_FACE2_OUTLINE_R_5)
        with Locations((53.033008589, -53.033008589)):
            Circle(MOVE_FACE2_OUTLINE_R_6, mode=Mode.SUBTRACT)
    # profile 38 of 38: a face of its own
    with BuildSketch(Plane.XY):
        Polygon((45, 19), (36.5, 19), (36.5, -16), (65, -16), (65, 24), (68.5, 24), (68.5, 30), (65, 30), (65, 45), (45, 45), (45, 30), (41.5, 30), (41.5, 24), (45, 24), align=None)
        Polygon((36.58, -15.92), (36.58, 18.92), (45.08, 18.92), (45.08, 24.08), (41.58, 24.08), (41.58, 29.92), (45.08, 29.92), (45.08, 44.92), (64.92, 44.92), (64.92, 29.92), (68.42, 29.92), (68.42, 24.08), (64.92, 24.08), (64.92, -15.92), align=None, mode=Mode.SUBTRACT)
    extrude(amount=MOVE_FACE2_DEPTH)

    # Move Face2 2 outline → Move Face2 2 (add)
    with BuildSketch(Plane.XY.offset(MOVE_START)):
        with BuildLine():
            ThreePointArc((-4.233244047, 81.389984917), (-3.206506152, 81.496938359), (-2.175628477, 81.550984303))
            ThreePointArc((-2.175628477, 81.550984303), (-8.974859181, 81.084821654), (-15.711454974, 80.052773735))
            ThreePointArc((-15.711454974, 80.052773735), (-15.7291327, 80.008510725), (-15.746884219, 79.964277258))
            ThreePointArc((-15.746884219, 79.964277258), (-10.01546514, 80.882262938), (-4.233244047, 81.389984917))
        make_face()
        with BuildLine():
            ThreePointArc((-51.224853888, 63.492603854), (-56.345648769, 58.995459696), (-61.073211328, 54.086590372))
            ThreePointArc((-61.073211328, 54.086590372), (-60.369174336, 54.841548424), (-59.627268849, 55.559326936))
            ThreePointArc((-59.627268849, 55.559326936), (-55.521591174, 59.662407876), (-51.134288174, 63.462859791))
            ThreePointArc((-51.134288174, 63.462859791), (-51.179583432, 63.477694064), (-51.224853888, 63.492603854))
        make_face()
    extrude(amount=MOVE_FACE2_2_DEPTH)


solid = part.part
